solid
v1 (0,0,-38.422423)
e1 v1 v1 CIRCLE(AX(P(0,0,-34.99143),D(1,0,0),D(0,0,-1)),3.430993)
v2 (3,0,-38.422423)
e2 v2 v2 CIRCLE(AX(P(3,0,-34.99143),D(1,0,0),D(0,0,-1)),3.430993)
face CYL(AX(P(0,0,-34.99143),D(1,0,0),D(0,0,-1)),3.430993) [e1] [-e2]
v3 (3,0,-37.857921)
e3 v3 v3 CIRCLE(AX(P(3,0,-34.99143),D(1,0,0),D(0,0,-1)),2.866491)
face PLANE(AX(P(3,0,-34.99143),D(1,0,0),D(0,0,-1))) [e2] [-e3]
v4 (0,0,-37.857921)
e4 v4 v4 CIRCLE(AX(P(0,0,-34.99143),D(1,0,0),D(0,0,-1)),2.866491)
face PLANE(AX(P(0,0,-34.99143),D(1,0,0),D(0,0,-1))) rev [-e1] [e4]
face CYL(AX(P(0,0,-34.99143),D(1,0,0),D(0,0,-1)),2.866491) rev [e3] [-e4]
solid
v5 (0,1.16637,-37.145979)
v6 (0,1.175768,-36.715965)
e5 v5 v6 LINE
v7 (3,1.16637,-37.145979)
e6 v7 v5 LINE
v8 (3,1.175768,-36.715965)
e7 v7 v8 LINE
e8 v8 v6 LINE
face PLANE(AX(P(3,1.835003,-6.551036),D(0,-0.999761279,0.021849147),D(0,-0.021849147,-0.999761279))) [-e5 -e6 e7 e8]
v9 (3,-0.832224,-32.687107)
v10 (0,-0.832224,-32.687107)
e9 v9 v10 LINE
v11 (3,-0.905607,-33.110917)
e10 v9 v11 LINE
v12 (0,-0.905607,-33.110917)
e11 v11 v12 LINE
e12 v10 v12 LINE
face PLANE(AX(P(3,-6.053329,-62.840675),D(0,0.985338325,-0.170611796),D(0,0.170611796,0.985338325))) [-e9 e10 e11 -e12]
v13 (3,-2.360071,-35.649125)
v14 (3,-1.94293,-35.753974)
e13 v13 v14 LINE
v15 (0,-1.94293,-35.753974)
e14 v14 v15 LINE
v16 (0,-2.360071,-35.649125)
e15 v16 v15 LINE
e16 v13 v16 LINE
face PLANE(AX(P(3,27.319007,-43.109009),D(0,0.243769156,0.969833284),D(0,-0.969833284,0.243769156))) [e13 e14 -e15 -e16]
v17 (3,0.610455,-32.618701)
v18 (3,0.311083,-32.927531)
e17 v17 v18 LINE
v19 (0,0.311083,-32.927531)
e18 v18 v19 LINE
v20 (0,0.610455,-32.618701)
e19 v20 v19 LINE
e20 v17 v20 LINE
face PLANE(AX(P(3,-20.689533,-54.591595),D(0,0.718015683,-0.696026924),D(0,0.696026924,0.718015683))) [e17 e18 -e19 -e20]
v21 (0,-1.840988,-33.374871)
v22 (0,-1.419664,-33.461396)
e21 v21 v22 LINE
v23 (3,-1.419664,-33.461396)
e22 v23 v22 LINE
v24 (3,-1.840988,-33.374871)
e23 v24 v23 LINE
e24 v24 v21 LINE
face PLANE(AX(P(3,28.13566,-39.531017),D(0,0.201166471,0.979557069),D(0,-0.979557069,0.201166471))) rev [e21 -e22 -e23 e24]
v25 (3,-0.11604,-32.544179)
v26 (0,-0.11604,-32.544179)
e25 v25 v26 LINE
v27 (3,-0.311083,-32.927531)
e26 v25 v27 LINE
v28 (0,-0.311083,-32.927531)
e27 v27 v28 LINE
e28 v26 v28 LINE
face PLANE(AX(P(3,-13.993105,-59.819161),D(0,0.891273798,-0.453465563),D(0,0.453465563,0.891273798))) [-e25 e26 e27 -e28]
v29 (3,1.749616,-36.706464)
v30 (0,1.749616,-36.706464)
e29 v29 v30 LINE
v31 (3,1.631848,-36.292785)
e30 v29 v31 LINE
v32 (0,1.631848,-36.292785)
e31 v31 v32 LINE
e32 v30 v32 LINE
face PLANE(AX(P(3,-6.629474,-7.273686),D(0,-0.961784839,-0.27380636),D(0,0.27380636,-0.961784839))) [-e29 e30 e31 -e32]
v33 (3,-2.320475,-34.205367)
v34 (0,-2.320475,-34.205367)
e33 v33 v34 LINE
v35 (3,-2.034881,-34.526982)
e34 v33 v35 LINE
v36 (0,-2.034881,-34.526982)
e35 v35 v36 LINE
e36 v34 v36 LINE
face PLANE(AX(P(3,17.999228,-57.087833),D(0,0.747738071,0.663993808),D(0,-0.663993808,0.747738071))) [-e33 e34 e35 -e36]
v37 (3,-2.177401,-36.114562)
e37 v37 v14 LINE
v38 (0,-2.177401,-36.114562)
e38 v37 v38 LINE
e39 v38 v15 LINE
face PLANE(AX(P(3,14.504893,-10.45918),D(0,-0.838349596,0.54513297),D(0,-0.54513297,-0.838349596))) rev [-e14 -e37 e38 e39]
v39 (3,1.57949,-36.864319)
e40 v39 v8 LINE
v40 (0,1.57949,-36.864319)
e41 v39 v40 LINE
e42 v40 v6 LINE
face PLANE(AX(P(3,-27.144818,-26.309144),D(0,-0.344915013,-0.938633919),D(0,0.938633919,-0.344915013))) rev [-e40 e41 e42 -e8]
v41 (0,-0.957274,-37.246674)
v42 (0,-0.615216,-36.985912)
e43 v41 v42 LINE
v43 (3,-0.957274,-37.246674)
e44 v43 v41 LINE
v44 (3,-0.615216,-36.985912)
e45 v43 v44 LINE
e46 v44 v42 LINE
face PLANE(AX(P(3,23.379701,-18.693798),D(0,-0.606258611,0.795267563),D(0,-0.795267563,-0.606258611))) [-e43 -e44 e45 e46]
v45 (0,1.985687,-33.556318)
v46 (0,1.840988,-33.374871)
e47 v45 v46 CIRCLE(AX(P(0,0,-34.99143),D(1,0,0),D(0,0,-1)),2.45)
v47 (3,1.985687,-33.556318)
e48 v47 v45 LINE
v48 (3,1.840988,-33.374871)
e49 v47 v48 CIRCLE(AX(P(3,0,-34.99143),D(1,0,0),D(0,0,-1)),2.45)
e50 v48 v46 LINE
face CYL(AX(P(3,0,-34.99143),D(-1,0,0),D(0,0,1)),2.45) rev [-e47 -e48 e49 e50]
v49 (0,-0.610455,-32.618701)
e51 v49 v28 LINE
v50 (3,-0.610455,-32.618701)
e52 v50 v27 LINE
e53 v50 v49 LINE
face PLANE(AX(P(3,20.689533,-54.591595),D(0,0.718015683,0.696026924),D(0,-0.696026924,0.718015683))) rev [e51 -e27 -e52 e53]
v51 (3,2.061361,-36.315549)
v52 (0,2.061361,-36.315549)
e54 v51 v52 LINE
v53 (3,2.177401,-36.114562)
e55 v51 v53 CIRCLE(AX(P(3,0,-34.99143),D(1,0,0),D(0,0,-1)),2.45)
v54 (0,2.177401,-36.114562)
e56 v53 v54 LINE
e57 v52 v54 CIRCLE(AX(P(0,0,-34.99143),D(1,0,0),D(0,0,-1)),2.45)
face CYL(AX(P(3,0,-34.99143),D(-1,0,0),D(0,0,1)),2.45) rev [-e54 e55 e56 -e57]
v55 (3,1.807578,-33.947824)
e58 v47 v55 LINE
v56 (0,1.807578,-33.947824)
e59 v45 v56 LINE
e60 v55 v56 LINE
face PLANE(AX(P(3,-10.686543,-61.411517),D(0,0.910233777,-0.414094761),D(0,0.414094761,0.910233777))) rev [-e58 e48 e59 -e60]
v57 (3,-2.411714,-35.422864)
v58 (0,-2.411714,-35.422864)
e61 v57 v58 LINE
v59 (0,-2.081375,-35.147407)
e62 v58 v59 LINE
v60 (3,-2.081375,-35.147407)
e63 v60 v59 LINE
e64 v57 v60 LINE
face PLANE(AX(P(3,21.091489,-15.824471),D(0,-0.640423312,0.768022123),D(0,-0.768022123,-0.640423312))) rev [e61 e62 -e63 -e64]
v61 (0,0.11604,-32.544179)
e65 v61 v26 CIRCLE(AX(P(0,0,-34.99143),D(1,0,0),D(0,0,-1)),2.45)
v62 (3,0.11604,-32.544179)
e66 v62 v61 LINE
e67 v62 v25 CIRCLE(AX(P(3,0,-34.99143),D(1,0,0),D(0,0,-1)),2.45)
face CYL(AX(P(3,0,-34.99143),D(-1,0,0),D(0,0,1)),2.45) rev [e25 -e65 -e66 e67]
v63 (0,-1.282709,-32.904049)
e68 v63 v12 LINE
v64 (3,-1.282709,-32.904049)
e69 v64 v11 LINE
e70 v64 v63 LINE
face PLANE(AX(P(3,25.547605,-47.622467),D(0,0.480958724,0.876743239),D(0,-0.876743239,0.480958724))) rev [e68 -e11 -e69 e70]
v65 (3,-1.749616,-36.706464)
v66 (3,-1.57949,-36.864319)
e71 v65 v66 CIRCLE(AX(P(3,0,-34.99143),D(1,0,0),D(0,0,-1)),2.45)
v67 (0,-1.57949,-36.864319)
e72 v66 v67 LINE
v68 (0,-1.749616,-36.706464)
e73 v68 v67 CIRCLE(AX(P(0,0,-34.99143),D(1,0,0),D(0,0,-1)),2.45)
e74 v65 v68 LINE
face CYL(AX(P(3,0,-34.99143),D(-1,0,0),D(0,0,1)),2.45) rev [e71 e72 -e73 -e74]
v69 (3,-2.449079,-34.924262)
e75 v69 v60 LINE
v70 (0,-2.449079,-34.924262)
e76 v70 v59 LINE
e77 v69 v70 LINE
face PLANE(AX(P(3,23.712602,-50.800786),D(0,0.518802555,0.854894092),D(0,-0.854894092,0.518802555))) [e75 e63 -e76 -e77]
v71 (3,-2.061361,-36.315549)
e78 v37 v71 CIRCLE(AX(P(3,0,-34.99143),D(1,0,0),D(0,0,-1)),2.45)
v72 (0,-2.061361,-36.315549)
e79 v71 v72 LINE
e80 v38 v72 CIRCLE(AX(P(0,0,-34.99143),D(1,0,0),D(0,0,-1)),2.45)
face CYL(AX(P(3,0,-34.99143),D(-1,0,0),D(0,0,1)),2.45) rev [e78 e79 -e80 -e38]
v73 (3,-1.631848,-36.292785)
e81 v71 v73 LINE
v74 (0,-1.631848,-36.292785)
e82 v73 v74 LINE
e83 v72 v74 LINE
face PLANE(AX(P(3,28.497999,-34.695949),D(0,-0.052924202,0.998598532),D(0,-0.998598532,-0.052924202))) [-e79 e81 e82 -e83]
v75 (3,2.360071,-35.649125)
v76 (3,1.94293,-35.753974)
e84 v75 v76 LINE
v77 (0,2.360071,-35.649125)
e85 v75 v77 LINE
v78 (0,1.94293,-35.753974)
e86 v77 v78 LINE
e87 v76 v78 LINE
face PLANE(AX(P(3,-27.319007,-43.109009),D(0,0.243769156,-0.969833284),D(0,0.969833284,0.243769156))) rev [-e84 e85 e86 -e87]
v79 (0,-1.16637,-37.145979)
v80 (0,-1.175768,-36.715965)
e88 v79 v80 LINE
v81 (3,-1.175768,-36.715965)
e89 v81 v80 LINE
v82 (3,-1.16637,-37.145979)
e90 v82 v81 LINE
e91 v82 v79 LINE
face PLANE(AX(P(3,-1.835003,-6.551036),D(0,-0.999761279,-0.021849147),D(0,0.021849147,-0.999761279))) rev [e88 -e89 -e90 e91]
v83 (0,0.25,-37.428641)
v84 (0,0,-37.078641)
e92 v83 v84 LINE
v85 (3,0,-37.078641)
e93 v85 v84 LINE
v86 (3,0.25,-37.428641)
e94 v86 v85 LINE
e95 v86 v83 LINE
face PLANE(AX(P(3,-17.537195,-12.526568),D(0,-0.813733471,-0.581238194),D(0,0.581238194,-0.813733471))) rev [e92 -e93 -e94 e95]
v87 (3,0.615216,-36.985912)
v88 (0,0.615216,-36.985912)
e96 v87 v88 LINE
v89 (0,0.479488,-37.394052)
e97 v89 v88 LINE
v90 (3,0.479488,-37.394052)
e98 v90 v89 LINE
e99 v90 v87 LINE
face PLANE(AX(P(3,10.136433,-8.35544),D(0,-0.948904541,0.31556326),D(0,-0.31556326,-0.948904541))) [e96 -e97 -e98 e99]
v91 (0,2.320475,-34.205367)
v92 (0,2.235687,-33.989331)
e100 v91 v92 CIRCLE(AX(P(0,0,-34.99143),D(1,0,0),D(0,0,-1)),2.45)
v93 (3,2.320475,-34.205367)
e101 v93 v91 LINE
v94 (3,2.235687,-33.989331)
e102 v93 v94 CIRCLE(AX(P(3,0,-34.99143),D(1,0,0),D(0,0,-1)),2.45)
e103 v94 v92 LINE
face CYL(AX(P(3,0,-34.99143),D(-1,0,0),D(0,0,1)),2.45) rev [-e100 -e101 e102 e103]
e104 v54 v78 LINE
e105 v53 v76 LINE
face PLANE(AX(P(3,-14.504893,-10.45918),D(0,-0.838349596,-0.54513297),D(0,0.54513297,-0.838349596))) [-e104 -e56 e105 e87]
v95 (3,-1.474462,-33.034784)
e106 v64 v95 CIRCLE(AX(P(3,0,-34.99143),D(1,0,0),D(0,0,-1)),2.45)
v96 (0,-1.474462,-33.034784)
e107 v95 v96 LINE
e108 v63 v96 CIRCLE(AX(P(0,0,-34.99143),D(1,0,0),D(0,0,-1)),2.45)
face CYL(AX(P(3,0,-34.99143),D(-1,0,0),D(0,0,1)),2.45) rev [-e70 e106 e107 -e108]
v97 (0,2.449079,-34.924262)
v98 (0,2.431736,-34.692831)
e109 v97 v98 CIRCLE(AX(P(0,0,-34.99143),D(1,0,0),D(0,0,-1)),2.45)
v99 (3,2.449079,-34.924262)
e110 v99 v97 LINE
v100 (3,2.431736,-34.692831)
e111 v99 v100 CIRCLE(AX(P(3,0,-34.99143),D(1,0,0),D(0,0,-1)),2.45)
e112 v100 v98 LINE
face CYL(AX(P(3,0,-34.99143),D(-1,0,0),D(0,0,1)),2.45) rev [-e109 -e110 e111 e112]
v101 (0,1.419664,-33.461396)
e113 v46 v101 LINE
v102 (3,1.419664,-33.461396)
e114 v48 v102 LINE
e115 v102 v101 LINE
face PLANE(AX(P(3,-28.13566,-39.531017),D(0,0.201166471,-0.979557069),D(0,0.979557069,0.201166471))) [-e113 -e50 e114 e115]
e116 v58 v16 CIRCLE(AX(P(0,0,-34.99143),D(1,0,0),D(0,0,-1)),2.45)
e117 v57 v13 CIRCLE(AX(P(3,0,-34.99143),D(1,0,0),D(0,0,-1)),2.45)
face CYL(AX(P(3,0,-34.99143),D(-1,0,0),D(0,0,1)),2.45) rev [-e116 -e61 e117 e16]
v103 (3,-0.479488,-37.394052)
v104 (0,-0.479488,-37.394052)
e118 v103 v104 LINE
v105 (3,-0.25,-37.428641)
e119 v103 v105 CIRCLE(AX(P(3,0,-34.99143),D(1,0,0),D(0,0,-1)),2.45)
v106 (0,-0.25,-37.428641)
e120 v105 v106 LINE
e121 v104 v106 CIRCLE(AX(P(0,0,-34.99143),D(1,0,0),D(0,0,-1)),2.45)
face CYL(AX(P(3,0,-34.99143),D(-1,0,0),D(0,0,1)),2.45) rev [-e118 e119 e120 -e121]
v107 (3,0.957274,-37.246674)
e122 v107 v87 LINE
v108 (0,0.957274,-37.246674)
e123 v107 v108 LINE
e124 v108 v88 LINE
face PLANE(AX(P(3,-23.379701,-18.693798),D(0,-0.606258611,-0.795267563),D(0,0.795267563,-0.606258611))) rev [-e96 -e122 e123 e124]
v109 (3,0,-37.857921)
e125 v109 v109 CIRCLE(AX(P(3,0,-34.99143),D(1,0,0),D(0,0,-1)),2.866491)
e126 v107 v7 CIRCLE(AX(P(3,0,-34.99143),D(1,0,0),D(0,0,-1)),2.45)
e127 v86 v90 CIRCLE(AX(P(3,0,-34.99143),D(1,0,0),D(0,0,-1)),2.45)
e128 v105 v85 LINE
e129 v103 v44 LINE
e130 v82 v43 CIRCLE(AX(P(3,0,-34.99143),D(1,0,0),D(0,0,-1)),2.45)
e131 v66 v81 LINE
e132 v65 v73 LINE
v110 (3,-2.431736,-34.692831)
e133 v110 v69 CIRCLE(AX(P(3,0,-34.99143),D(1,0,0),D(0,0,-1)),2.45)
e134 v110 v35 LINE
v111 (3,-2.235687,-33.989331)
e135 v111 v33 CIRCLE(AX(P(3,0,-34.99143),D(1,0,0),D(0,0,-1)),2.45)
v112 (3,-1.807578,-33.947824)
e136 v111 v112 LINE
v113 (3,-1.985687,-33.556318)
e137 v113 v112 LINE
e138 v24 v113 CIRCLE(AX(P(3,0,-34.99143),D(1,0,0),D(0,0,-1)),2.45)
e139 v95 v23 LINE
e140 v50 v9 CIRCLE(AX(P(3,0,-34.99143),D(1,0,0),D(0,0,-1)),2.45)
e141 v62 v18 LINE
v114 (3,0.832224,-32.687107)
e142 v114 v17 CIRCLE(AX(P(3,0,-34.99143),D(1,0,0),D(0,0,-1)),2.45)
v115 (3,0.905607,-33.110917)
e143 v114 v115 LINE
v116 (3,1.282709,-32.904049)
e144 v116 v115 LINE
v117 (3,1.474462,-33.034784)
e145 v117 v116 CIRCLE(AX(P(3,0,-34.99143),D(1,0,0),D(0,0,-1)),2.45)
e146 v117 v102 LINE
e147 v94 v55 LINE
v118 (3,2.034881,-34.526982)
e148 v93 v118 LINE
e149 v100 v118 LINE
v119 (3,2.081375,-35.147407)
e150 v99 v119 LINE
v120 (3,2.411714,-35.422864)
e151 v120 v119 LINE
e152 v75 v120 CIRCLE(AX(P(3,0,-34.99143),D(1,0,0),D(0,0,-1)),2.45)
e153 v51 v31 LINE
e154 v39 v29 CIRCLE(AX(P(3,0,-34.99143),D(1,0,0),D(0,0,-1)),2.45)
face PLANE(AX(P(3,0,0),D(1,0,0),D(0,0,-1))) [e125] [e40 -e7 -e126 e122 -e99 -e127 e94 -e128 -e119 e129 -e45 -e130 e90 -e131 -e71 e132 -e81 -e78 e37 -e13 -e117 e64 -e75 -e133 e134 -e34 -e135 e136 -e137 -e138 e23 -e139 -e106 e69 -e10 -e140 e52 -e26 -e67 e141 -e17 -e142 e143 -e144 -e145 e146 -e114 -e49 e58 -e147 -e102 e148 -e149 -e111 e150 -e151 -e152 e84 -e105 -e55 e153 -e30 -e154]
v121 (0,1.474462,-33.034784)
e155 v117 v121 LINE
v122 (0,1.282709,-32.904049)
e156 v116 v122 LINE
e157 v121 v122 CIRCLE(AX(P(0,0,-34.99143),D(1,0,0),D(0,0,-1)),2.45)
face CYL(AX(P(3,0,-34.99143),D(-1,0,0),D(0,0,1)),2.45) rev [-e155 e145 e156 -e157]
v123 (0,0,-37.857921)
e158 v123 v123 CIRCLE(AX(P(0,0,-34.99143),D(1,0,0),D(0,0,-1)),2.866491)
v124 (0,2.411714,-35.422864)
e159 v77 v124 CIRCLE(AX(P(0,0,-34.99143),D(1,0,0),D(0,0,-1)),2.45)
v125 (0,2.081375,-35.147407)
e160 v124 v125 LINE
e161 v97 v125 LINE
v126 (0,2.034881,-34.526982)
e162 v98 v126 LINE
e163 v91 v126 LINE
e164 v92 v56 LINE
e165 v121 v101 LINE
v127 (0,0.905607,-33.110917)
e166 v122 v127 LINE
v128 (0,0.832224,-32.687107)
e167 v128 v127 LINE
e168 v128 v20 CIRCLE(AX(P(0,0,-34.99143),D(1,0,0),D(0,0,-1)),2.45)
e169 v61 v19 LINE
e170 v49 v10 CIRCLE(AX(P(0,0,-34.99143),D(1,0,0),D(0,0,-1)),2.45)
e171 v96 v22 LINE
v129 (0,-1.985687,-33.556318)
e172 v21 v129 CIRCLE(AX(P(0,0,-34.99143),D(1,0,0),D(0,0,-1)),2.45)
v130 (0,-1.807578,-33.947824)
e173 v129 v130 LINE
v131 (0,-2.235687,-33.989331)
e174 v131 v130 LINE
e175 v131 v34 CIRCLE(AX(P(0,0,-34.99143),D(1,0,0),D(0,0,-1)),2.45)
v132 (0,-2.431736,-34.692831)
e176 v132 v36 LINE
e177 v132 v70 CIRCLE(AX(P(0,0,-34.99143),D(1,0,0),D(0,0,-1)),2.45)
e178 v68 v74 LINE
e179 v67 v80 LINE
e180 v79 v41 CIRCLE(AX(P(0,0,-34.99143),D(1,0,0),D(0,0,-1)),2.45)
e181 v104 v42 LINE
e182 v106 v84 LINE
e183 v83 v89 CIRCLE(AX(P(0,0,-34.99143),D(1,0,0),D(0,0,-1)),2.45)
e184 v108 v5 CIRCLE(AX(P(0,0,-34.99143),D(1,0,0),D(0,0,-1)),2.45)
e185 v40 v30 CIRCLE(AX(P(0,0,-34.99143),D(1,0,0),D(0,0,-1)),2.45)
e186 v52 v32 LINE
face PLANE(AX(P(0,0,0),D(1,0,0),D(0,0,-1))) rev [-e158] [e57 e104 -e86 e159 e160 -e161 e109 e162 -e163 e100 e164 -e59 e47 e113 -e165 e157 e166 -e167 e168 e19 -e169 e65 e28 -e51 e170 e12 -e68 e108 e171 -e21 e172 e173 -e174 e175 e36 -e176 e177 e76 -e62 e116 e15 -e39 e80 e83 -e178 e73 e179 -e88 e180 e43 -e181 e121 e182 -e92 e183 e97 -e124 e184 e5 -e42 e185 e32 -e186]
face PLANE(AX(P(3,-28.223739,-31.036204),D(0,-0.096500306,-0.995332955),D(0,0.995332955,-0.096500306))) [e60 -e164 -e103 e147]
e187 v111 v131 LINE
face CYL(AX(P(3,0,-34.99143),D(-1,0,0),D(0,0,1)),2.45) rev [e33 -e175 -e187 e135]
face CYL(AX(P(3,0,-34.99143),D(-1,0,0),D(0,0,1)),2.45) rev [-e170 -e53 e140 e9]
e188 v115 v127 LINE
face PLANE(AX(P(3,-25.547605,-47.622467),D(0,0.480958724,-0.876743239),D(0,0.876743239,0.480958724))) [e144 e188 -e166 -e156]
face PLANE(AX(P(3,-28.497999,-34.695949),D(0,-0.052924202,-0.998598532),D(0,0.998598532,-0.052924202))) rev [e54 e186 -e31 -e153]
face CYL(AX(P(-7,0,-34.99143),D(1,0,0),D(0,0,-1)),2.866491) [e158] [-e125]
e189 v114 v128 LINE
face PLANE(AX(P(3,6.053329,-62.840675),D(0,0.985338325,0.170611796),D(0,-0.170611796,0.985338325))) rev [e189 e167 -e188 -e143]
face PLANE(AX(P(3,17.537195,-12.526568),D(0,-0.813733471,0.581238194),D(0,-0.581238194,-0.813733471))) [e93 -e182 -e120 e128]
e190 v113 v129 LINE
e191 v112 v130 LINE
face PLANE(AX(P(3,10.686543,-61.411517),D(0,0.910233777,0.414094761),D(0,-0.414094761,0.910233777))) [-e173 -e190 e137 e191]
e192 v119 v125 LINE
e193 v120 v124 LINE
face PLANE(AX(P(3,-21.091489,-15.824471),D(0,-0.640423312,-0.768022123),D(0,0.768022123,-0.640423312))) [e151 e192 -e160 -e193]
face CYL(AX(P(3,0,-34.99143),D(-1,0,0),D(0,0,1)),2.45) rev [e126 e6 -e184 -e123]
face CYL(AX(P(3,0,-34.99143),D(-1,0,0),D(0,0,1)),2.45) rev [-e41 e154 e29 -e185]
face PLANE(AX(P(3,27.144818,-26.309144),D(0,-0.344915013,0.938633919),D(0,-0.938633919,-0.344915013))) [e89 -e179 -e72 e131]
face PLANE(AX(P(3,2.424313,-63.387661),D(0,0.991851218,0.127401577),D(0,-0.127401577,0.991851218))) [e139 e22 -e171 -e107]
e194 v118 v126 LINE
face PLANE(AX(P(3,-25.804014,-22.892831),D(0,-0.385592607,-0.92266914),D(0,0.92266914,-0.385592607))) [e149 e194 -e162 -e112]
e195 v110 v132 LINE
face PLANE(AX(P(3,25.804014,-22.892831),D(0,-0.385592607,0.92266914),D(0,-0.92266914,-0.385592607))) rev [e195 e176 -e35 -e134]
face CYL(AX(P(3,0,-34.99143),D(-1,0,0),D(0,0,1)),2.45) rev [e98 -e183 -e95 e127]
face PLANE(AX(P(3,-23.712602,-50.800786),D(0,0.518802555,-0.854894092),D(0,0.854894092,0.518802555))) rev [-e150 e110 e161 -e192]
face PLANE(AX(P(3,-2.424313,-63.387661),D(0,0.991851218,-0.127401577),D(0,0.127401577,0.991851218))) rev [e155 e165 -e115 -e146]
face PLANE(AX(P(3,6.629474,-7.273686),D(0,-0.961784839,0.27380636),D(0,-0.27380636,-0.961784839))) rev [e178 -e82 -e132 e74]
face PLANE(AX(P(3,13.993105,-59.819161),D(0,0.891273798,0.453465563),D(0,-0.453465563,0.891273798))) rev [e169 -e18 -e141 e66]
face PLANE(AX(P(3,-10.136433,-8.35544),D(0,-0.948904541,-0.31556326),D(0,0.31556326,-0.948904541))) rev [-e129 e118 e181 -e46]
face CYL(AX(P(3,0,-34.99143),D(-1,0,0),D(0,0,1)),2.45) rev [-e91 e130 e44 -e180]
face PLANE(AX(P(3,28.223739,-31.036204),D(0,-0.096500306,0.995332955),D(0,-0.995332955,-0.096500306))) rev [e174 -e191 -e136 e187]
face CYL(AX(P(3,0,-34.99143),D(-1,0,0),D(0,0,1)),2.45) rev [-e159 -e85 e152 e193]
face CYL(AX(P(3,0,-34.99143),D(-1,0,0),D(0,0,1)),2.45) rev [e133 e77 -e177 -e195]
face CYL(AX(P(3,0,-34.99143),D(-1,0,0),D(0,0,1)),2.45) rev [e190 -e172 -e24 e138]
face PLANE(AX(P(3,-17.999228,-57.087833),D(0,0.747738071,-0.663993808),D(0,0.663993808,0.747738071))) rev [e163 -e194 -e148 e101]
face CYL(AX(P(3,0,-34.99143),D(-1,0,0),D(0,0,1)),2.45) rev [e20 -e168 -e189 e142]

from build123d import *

# Parameters (mm, degrees)
EXTRUDE_1_OUTLINE_R      = 2.45
EXTRUDE_1_DEPTH          = 3
EXTRUDE_2_DEPTH          = 3
PATTERN_CIRCULAR_1_COUNT = 21
SKETCH2_R                = 8.547586549
SKETCH2_R_2              = 3.001513839
CUT_EXTRUDE1_DEPTH       = 10
BOSS_EXTRUDE1_DEPTH      = 3
CIRPATTERN6_COUNT        = 22
CIRPATTERN6_ANGLE        = 345.24
SKETCH_2_R               = 4.158407847
SKETCH_2_R_2             = 2.866491316
CUT_EXTRUDE_1_DEPTH      = 10
SKETCH_3_R               = 3.430993381
SKETCH_3_R_2             = 2.866491316
EXTRUDE_3_DEPTH          = 3


# Read off the part's stored shape, not the designer's step: Бобышка-Вытянуть1, Бобышка-Вытянуть2
with BuildPart() as part:
    # Бобышка-Вытянуть1 outline → Бобышка-Вытянуть1 (new body)
    with BuildSketch(Plane.YZ):
        with BuildLine():
            ThreePointArc((7.60775827, -34.09831761), (6.73424843, -33.630363316), (5.760344946, -33.44729867))
            add(Edge.make_bspline(
                [(5.760344946, -33.44729867), (5.46713328, -33.652163863), (5.029274696, -33.876555627), (4.421054767, -33.805447152), (4.212742264, -33.546022471), (4.096748531, -33.239168782), (3.977348555, -32.974896207), (3.887120883, -32.809203227), (3.860215155, -32.76273366)],
                knots=[0, 0, 0, 0, 0.384536387, 0.512259949, 0.613992842, 0.721907854, 0.866992584, 0.924751204, 0.924751204, 0.924751204, 0.924751204], degree=3))
            add(Edge.make_bspline(
                [(4.213382498, -30.770846655), (3.889503683, -30.922653577), (3.476501747, -31.190050668), (3.234513044, -31.752571214), (3.355322595, -32.062571724), (3.563312271, -32.31625268), (3.733540633, -32.552791241), (3.832728628, -32.714954029), (3.860215155, -32.76273366)],
                knots=[0, 0, 0, 0, 0.384536387, 0.512259949, 0.613992842, 0.721907854, 0.866992584, 0.926284353, 0.926284353, 0.926284353, 0.926284353], degree=3))
            ThreePointArc((4.213382498, -30.770846655), (4.540898548, -29.835574557), (4.571443, -28.845085941))
            ThreePointArc((4.571443, -28.845085941), (3.833465447, -28.344311993), (3.030421179, -27.956361842))
            ThreePointArc((3.030421179, -27.956361842), (2.188405953, -28.478866407), (1.542915576, -29.230759241))
            add(Edge.make_bspline(
                [(1.542915576, -29.230759241), (1.573728205, -29.587120589), (1.549127882, -30.078513128), (1.183436171, -30.5696928), (0.854611556, -30.620384379), (0.530871599, -30.567411055), (0.242304847, -30.538678179), (0.053696682, -30.533971145), (-8e-09, -30.534037406)],
                knots=[0, 0, 0, 0, 0.384536387, 0.512259949, 0.613992842, 0.721907854, 0.866992584, 0.924751204, 0.924751204, 0.924751204, 0.924751204], degree=3))
            add(Edge.make_bspline(
                [(-1.548441084, -29.232242013), (-1.578911841, -29.588632755), (-1.553840136, -30.080001469), (-1.187677404, -30.570830107), (-0.858804311, -30.621206221), (-0.535115321, -30.567922356), (-0.245152737, -30.53876955), (-0.055121646, -30.533951621), (-8e-09, -30.534037406)],
                knots=[0, 0, 0, 0, 0.384536387, 0.512259949, 0.613992842, 0.721907854, 0.866992584, 0.926284353, 0.926284353, 0.926284353, 0.926284353], degree=3))
            ThreePointArc((-1.548441084, -29.232242013), (-2.194652456, -28.480968744), (-3.037168533, -27.959272165))
            ThreePointArc((-3.037168533, -27.959272165), (-3.839840271, -28.347992499), (-4.577337091, -28.84947416))
            ThreePointArc((-4.577337091, -28.84947416), (-4.545842477, -29.839933019), (-4.217429369, -30.7748905))
            add(Edge.make_bspline(
                [(-4.217429369, -30.7748905), (-3.893405075, -30.926386654), (-3.480146815, -31.193387429), (-3.237618596, -31.755675577), (-3.358130708, -32.065791836), (-3.565876932, -32.3196722), (-3.735043708, -32.5552119), (-3.833424202, -32.716197846), (-3.860215162, -32.762733674)],
                knots=[0, 0, 0, 0, 0.384536387, 0.512259949, 0.613992842, 0.721907854, 0.866992584, 0.924751204, 0.924751204, 0.924751204, 0.924751204], degree=3))
            add(Edge.make_bspline(
                [(-5.761823582, -33.452825286), (-5.468415524, -33.657409106), (-5.030341882, -33.881380729), (-4.422190447, -33.80968882), (-4.214126907, -33.550064425), (-4.098427592, -33.243099604), (-3.978693371, -32.977408237), (-3.887850274, -32.81042752), (-3.860215162, -32.762733674)],
                knots=[0, 0, 0, 0, 0.384536387, 0.512259949, 0.613992842, 0.721907854, 0.866992584, 0.926284353, 0.926284353, 0.926284353, 0.926284353], degree=3))
            ThreePointArc((-5.761823582, -33.452825286), (-6.735551004, -33.636824115), (-7.608611533, -34.105616152))
            ThreePointArc((-7.608611533, -34.105616152), (-7.673305717, -34.995110434), (-7.60775827, -35.884542246))
            ThreePointArc((-7.60775827, -35.884542246), (-6.73424843, -36.35249654), (-5.760344946, -36.535561187))
            add(Edge.make_bspline(
                [(-5.760344946, -36.535561187), (-5.46713328, -36.330695993), (-5.029274696, -36.106304229), (-4.421054767, -36.177412704), (-4.212742264, -36.436837385), (-4.096748531, -36.743691074), (-3.977348555, -37.007963649), (-3.887120883, -37.173656629), (-3.860215155, -37.220126196)],
                knots=[0, 0, 0, 0, 0.384536387, 0.512259949, 0.613992842, 0.721907854, 0.866992584, 0.924751204, 0.924751204, 0.924751204, 0.924751204], degree=3))
            add(Edge.make_bspline(
                [(-4.213382498, -39.212013201), (-3.889503683, -39.060206279), (-3.476501747, -38.792809189), (-3.234513044, -38.230288642), (-3.355322595, -37.920288132), (-3.563312271, -37.666607177), (-3.733540633, -37.430068615), (-3.832728628, -37.267905828), (-3.860215155, -37.220126196)],
                knots=[0, 0, 0, 0, 0.384536387, 0.512259949, 0.613992842, 0.721907854, 0.866992584, 0.926284353, 0.926284353, 0.926284353, 0.926284353], degree=3))
            ThreePointArc((-4.213382498, -39.212013201), (-4.540898548, -40.147285299), (-4.571443, -41.137773915))
            ThreePointArc((-4.571443, -41.137773915), (-3.833465447, -41.638547863), (-3.030421179, -42.026498015))
            ThreePointArc((-3.030421179, -42.026498015), (-2.188405953, -41.503993449), (-1.542915576, -40.752100615))
            add(Edge.make_bspline(
                [(-1.542915576, -40.752100615), (-1.573728205, -40.395739267), (-1.549127882, -39.904346728), (-1.183436171, -39.413167056), (-0.854611556, -39.362475477), (-0.530871599, -39.415448802), (-0.242304847, -39.444181677), (-0.053696682, -39.448888711), (8e-09, -39.44882245)],
                knots=[0, 0, 0, 0, 0.384536387, 0.512259949, 0.613992842, 0.721907854, 0.866992584, 0.924751204, 0.924751204, 0.924751204, 0.924751204], degree=3))
            add(Edge.make_bspline(
                [(1.548441084, -40.750617843), (1.578911841, -40.394227101), (1.553840136, -39.902858387), (1.187677404, -39.41202975), (0.858804311, -39.361653636), (0.535115321, -39.4149375), (0.245152737, -39.444090306), (0.055121646, -39.448908236), (8e-09, -39.44882245)],
                knots=[0, 0, 0, 0, 0.384536387, 0.512259949, 0.613992842, 0.721907854, 0.866992584, 0.926284353, 0.926284353, 0.926284353, 0.926284353], degree=3))
            ThreePointArc((1.548441084, -40.750617843), (2.194652456, -41.501891112), (3.037168533, -42.023587691))
            ThreePointArc((3.037168533, -42.023587691), (3.839840271, -41.634867357), (4.577337091, -41.133385696))
            ThreePointArc((4.577337091, -41.133385696), (4.545842477, -40.142926837), (4.217429369, -39.207969356))
            add(Edge.make_bspline(
                [(4.217429369, -39.207969356), (3.893405075, -39.056473202), (3.480146815, -38.789472427), (3.237618596, -38.22718428), (3.358130708, -37.91706802), (3.565876932, -37.663187656), (3.735878304, -37.426485903), (3.834910691, -37.264228039), (3.862345998, -37.216418958)],
                knots=[0, 0, 0, 0, 0.384536387, 0.512259949, 0.613992842, 0.721907854, 0.866992584, 0.926284353, 0.926284353, 0.926284353, 0.926284353], degree=3))
            add(Edge.make_bspline(
                [(5.761823582, -36.53003457), (5.468415524, -36.32545075), (5.030341882, -36.101479127), (4.422190447, -36.173171036), (4.214126907, -36.432795431), (4.098427592, -36.739760252), (3.979281188, -37.004147246), (3.889212507, -37.169926706), (3.862345998, -37.216418958)],
                knots=[0, 0, 0, 0, 0.384536387, 0.512259949, 0.613992842, 0.721907854, 0.866992584, 0.924751204, 0.924751204, 0.924751204, 0.924751204], degree=3))
            ThreePointArc((5.761823582, -36.53003457), (6.735551004, -36.346035741), (7.608611533, -35.877243704))
            ThreePointArc((7.608611533, -35.877243704), (7.673305717, -34.987749422), (7.60775827, -34.09831761))
        make_face()
        with Locations((0, -34.991429928)):
            Circle(EXTRUDE_1_OUTLINE_R, mode=Mode.SUBTRACT)
    extrude(amount=EXTRUDE_1_DEPTH)

    # Бобышка-Вытянуть2 outline → Бобышка-Вытянуть2 (add)
    with BuildSketch(Plane.YZ):
        with BuildLine():
            Line((0.25, -37.428641449), (0, -37.078641449))
            Line((0, -37.078641449), (-0.25, -37.428641449))
            ThreePointArc((-0.25, -37.428641449), (0, -37.441429928), (0.25, -37.428641449))
        make_face()
    extrude_2 = extrude(amount=EXTRUDE_2_DEPTH)

    # Круговой массив1: Бобышка-Вытянуть2 ×21 about axis
    pattern_circular_1_axis = Axis((0, 0, -34.991429928), (1, 0, 0))
    for i in range(1, PATTERN_CIRCULAR_1_COUNT):
        add(extrude_2.rotate(pattern_circular_1_axis, i * 360 / PATTERN_CIRCULAR_1_COUNT))

    # Sketch2 → Cut-Extrude1 (cut)
    with BuildSketch(Plane(origin=(3, 0, 0), x_dir=(0, 0, -1), z_dir=(1, 0, 0))):
        with Locations((34.991429928, 0)):
            Circle(SKETCH2_R)
        with Locations((34.991429928, 0)):
            Circle(SKETCH2_R_2, mode=Mode.SUBTRACT)
    extrude(amount=-CUT_EXTRUDE1_DEPTH, mode=Mode.SUBTRACT)

    # Sketch3 → Boss-Extrude1 (add)
    with BuildSketch(Plane(origin=(3, 0, 0), x_dir=(0, 0, -1), z_dir=(1, 0, 0))):
        Polygon((32.116918179, 0.398551141), (31.120540325, 0), (32.116918179, -0.398551141), (32.116918179, -0.001448859), (32.116918179, 0.001448859), align=None)
    boss_extrude1 = extrude(amount=-BOSS_EXTRUDE1_DEPTH)

    # CirPattern6: Boss-Extrude1 ×22 about axis
    cirpattern6_axis = Axis((0, 0, -34.991429928), (1, 0, 0))
    for i in range(1, CIRPATTERN6_COUNT):
        add(boss_extrude1.rotate(cirpattern6_axis, i * CIRPATTERN6_ANGLE / (CIRPATTERN6_COUNT - 1)))

    # Эскиз2 → Вырез-Вытянуть1 (cut)
    with BuildSketch(Plane(origin=(3, 0, 0), x_dir=(0, 0, -1), z_dir=(1, 0, 0))):
        with Locations((34.991429928, 0)):
            Circle(SKETCH_2_R)
        with Locations((34.991429928, 0)):
            Circle(SKETCH_2_R_2, mode=Mode.SUBTRACT)
    extrude(amount=-CUT_EXTRUDE_1_DEPTH, mode=Mode.SUBTRACT)


with BuildPart() as body_2:
    # Эскиз3 → Бобышка-Вытянуть3 (new body)
    with BuildSketch(Plane(origin=(3, 0, 0), x_dir=(0, 0, -1), z_dir=(1, 0, 0))):
        with Locations((34.991429928, 0)):
            Circle(SKETCH_3_R)
        with Locations((34.991429928, 0)):
            Circle(SKETCH_3_R_2, mode=Mode.SUBTRACT)
    extrude(amount=-EXTRUDE_3_DEPTH)


solid = Compound([part.part, body_2.part])
